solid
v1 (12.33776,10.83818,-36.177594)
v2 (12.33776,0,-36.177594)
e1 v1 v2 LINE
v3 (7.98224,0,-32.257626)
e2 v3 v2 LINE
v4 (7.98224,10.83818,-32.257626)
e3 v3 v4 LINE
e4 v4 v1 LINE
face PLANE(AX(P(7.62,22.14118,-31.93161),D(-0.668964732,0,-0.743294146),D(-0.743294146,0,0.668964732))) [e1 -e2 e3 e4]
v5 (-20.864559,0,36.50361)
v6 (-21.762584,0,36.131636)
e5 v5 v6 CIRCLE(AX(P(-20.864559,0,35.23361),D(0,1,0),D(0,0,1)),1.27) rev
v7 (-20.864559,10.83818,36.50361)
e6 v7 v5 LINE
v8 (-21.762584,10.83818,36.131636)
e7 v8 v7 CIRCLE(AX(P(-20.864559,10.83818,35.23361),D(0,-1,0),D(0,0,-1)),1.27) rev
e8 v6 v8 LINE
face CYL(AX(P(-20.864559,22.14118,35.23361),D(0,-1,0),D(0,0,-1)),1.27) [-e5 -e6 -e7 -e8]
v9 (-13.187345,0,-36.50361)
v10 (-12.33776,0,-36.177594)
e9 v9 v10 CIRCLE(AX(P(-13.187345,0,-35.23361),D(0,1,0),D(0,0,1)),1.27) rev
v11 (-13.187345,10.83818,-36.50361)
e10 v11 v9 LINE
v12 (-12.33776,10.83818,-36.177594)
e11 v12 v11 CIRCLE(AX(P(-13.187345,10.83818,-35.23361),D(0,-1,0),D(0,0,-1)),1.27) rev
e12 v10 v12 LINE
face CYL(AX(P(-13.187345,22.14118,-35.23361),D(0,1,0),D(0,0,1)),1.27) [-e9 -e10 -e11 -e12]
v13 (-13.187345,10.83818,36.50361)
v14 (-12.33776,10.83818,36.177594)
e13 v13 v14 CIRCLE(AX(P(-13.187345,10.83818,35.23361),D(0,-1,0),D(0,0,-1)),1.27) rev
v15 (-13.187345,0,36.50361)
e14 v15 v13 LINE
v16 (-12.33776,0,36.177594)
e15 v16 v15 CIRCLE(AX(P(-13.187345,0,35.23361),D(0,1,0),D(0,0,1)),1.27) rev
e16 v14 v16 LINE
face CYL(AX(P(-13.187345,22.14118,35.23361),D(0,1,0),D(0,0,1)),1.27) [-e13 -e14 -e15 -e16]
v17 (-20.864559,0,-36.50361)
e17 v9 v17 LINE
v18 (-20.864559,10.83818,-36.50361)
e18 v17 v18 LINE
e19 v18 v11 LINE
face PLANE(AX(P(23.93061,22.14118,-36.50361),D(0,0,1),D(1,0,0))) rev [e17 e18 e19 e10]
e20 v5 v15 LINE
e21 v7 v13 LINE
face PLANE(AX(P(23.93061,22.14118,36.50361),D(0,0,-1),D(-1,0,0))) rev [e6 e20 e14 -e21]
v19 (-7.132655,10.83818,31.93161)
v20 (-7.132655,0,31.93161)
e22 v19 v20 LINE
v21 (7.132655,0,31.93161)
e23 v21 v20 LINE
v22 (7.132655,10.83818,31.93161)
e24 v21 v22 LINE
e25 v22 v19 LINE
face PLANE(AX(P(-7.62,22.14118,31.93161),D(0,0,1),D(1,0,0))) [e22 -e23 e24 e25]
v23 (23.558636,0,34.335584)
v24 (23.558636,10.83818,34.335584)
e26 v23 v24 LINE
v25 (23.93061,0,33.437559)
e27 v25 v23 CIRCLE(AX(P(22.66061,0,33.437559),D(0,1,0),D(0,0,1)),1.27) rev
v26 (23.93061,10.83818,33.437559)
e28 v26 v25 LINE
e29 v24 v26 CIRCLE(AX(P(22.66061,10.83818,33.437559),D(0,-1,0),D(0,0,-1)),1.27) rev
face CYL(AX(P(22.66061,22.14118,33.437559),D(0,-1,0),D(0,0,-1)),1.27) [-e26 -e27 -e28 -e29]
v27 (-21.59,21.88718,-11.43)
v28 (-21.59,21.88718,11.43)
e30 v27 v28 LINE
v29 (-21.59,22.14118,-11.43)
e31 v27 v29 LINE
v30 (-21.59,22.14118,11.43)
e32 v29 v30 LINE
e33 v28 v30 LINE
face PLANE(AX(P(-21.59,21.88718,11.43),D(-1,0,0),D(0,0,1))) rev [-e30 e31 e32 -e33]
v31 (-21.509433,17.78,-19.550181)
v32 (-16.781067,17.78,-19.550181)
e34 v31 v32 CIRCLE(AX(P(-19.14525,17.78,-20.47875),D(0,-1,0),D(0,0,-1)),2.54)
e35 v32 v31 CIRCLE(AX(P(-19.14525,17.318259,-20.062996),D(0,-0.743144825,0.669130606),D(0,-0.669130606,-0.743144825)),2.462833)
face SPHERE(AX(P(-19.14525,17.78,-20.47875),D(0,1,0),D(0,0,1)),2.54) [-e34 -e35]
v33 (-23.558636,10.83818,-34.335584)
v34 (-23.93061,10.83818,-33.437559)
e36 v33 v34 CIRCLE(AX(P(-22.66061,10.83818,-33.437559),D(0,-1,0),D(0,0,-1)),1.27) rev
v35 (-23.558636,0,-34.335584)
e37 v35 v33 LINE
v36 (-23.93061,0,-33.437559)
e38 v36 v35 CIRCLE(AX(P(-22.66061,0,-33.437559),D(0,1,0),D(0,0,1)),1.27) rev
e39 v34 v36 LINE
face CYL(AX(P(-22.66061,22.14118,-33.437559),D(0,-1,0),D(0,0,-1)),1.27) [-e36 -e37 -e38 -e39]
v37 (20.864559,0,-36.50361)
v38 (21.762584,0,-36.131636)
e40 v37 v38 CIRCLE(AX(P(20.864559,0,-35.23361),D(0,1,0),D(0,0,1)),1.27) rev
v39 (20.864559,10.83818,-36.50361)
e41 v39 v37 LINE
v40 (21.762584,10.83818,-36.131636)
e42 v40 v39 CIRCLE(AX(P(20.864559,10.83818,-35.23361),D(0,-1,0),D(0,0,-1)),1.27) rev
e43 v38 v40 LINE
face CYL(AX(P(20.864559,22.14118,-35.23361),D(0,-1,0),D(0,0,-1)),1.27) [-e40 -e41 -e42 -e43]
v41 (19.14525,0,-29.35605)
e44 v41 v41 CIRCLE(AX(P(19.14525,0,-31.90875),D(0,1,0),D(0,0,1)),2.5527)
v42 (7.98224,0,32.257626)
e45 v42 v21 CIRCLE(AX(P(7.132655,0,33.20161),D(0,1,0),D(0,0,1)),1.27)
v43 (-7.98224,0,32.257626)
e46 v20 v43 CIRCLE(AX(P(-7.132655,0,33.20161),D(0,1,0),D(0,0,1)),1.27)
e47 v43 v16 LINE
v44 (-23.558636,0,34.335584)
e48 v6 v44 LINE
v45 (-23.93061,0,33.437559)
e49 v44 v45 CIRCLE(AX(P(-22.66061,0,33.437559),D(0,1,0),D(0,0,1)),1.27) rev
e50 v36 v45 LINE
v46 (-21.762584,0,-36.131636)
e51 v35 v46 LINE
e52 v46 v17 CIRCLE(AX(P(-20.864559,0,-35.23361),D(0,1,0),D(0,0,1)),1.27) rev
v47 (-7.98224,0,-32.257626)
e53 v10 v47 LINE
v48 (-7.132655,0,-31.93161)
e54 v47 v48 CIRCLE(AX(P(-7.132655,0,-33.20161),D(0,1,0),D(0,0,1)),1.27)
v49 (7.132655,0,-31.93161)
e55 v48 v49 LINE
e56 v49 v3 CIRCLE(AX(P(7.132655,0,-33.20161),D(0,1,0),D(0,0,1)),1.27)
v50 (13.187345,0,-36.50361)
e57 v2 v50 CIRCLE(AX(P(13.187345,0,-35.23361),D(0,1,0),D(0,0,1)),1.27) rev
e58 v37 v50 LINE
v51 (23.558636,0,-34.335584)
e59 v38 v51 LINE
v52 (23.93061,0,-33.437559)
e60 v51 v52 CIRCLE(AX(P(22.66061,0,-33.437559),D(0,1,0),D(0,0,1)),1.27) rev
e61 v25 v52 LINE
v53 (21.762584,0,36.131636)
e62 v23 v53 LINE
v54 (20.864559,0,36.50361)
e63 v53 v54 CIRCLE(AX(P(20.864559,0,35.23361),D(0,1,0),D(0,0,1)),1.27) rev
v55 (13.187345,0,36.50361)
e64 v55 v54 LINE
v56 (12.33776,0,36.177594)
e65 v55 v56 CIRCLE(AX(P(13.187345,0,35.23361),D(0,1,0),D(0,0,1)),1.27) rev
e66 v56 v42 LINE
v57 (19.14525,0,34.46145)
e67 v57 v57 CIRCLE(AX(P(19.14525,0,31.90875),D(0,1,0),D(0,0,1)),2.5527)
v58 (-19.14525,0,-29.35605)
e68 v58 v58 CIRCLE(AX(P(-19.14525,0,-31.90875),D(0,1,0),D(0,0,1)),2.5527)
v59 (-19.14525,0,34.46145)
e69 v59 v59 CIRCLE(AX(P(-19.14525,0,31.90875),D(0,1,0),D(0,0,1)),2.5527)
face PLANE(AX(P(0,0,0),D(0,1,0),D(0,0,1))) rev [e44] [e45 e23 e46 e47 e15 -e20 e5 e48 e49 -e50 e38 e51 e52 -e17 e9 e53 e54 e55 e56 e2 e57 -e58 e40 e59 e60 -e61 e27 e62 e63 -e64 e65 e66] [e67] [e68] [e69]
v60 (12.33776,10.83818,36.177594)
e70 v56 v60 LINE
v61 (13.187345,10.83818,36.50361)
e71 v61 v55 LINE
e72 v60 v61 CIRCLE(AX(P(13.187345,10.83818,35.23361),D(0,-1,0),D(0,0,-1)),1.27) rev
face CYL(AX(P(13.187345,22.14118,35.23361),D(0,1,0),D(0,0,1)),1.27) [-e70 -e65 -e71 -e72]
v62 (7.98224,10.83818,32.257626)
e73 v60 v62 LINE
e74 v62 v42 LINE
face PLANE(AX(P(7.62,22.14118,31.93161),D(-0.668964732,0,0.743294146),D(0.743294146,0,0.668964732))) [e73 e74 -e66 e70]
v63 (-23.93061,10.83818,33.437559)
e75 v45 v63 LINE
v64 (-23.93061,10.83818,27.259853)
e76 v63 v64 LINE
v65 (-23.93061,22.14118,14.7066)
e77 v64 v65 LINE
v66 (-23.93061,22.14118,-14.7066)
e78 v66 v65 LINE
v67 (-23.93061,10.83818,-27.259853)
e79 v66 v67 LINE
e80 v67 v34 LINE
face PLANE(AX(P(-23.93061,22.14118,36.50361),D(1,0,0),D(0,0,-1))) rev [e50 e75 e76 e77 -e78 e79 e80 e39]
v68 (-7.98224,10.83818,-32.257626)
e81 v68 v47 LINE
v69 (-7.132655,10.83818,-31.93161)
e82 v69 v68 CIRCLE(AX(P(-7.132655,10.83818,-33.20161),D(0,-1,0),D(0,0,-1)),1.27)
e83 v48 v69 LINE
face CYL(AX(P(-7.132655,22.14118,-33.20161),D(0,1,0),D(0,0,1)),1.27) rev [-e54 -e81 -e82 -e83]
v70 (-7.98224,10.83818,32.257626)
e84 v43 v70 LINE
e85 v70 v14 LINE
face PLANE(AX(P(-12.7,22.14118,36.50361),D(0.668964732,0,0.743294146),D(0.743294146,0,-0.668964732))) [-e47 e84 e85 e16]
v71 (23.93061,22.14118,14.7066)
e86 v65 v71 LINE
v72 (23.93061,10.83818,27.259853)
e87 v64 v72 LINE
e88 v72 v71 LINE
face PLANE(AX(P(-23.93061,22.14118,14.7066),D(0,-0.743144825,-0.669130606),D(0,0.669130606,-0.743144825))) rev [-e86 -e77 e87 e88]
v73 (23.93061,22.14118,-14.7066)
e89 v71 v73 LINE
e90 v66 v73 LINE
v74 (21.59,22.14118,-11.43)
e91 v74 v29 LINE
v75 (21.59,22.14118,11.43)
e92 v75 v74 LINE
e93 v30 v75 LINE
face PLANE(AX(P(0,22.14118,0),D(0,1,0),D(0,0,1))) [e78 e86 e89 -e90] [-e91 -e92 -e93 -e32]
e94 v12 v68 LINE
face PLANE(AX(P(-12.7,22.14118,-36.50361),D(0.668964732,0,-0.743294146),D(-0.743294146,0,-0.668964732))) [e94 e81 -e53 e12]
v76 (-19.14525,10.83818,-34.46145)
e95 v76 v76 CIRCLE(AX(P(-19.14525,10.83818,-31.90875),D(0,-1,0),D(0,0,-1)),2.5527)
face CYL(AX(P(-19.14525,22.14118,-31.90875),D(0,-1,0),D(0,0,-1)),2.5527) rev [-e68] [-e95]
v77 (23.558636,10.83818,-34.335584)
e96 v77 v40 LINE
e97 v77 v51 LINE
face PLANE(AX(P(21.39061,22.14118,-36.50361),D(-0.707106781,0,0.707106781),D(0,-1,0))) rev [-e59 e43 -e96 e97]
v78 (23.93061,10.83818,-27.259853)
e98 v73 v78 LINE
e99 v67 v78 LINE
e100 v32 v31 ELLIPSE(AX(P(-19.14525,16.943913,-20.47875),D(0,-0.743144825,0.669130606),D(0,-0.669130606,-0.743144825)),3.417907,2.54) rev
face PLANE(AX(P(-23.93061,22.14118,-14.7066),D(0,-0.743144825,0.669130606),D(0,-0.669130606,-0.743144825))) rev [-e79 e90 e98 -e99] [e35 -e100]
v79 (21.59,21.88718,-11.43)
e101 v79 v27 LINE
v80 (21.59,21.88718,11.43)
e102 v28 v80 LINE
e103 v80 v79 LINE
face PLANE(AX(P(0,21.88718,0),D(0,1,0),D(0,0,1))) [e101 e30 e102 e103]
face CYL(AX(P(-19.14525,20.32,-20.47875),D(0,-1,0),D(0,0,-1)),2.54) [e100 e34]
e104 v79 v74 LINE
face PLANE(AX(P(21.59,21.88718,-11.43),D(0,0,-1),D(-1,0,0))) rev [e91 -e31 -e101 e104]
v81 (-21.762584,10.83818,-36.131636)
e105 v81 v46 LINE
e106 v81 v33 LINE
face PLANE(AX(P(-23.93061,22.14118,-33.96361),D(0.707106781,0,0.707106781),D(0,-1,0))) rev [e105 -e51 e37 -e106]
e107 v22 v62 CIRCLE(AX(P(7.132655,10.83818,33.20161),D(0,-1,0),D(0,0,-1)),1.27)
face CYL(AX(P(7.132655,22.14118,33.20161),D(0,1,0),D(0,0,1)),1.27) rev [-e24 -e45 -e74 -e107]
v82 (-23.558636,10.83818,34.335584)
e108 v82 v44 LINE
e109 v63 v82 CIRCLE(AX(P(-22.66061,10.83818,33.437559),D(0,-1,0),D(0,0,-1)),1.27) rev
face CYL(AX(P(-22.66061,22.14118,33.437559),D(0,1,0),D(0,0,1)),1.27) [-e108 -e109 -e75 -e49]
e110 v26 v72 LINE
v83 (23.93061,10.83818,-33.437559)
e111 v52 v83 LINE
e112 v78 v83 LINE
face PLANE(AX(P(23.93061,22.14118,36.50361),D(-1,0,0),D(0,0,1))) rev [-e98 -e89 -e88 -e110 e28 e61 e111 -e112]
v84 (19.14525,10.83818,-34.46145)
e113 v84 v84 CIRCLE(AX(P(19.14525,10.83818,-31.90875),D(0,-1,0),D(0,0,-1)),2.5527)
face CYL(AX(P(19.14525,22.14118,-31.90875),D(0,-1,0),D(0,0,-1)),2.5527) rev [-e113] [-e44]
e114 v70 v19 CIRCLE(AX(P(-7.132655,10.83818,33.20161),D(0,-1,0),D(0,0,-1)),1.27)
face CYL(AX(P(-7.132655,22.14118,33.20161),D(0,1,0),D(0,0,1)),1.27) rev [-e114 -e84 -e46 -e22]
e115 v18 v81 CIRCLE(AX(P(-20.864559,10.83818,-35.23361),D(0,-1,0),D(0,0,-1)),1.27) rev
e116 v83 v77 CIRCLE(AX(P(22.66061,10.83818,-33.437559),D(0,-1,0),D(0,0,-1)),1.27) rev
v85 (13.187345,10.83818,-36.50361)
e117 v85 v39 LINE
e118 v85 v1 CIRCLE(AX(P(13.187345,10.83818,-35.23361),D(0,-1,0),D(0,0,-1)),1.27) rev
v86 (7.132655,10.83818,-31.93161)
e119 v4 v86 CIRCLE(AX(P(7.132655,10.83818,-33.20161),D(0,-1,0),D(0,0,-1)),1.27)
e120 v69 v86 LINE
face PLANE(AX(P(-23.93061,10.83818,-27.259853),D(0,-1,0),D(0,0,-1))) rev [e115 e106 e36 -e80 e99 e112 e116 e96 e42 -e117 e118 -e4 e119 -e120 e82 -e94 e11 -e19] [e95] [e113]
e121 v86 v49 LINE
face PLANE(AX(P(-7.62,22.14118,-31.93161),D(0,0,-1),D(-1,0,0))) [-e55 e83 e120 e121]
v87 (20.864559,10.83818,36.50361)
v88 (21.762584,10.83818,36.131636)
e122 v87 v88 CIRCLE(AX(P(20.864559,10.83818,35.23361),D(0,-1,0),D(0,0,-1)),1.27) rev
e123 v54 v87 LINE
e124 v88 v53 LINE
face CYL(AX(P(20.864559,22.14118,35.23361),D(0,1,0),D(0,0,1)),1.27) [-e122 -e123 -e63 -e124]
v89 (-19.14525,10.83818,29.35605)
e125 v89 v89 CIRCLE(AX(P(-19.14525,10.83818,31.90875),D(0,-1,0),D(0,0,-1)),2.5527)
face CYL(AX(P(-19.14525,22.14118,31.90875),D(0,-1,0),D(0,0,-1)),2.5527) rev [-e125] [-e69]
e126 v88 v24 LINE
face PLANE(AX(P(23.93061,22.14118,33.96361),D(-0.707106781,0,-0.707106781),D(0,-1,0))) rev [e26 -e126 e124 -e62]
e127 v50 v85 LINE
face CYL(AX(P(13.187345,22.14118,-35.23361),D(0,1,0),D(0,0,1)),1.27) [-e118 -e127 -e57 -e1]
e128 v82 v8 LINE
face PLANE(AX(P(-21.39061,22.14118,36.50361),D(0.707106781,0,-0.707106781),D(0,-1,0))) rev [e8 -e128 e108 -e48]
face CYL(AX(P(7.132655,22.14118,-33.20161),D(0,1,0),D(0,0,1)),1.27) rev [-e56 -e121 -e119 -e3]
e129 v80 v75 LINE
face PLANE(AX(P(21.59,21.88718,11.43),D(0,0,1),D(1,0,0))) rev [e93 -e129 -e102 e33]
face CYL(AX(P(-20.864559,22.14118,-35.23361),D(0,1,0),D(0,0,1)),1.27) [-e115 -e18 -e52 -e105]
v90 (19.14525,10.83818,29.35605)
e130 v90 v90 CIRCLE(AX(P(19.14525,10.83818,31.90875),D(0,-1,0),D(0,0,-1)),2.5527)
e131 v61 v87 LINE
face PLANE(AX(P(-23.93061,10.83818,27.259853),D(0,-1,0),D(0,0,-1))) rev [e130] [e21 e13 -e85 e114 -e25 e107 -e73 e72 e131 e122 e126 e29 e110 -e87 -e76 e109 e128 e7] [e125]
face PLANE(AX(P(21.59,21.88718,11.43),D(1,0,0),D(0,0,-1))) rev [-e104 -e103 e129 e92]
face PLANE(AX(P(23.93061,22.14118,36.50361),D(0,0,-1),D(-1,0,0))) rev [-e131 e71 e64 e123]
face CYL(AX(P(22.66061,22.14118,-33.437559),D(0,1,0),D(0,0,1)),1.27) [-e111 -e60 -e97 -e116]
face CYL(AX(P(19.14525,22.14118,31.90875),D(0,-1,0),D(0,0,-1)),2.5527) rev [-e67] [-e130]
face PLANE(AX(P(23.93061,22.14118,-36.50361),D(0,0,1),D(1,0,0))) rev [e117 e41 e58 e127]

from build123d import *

# Parameters (mm, degrees)
SKETCH1_W               = 47.86122
SKETCH1_H               = 73.00722
SKETCH1_R               = 2.5527
BOSS_EXTRUDE1_DEPTH     = 22.14118
CUT_EXTRUDE1_DEPTH      = 49.943022892
CUT_EXTRUDE1_DEPTH_BACK = 49.943022892
CHAMFER1_SIZE           = 2.54
CUT_EXTRUDE2_DEPTH      = 49.943022892
SKETCH5_W               = 43.18
SKETCH5_H               = 22.86
CUT_EXTRUDE3_DEPTH      = 0.254
SKETCH7_R               = 2.54
BOSS_EXTRUDE3_DEPTH     = 20.32
FILLET1_R               = 2.54
FILLET2_R               = 1.27


with BuildPart() as part:
    # Sketch1 → Boss-Extrude1 (new body)
    with BuildSketch(Plane(origin=(0, 0, 0), x_dir=(1, 0, 0), z_dir=(0, 1, 0))):
        Rectangle(SKETCH1_W, SKETCH1_H)
        with Locations(Location((-19.14525, 31.90875, 0), (0, 0, 270))):
            Circle(SKETCH1_R, mode=Mode.SUBTRACT)
        with Locations(Location((19.14525, 31.90875, 0), (0, 0, 270))):
            Circle(SKETCH1_R, mode=Mode.SUBTRACT)
        with Locations(Location((19.14525, -31.90875, 0), (0, 0, 270))):
            Circle(SKETCH1_R, mode=Mode.SUBTRACT)
        with Locations(Location((-19.14525, -31.90875, 0), (0, 0, 270))):
            Circle(SKETCH1_R, mode=Mode.SUBTRACT)
    extrude(amount=BOSS_EXTRUDE1_DEPTH)

    # Sketch2 → Cut-Extrude1 (cut, two sides: drawn at the far end of the back side and taken through both)
    with BuildSketch(Plane(origin=(0, 0, 0), x_dir=(0, 0, -1), z_dir=(1, 0, 0)).offset(-CUT_EXTRUDE1_DEPTH_BACK)):
        Polygon((14.7066, 22.14118), (-14.7066, 22.14118), (-27.259853255, 10.83818), (-36.50361, 10.83818), (-45.550551374, 42.074053009), (0, 43.630244296), (45.550551374, 42.074053009), (36.50361, 10.83818), (27.259853255, 10.83818), align=None)
    extrude(amount=CUT_EXTRUDE1_DEPTH + CUT_EXTRUDE1_DEPTH_BACK, mode=Mode.SUBTRACT)

    # Chamfer1
    chamfer1_edges = [part.edges().sort_by_distance(p)[0] for p in [
        (-23.93061, 5.41909, -36.50361),
        (23.93061, 5.41909, -36.50361),
        (23.93061, 5.41909, 36.50361),
        (-23.93061, 5.41909, 36.50361),
    ]]
    chamfer(chamfer1_edges, length=CHAMFER1_SIZE)

    # Sketch4 → Cut-Extrude2 (cut, through all)
    with BuildSketch(Plane(origin=(0, 0, 0), x_dir=(1, 0, 0), z_dir=(0, 1, 0))):
        Polygon((-12.7, 36.50361), (-7.62, 31.93161), (7.62, 31.93161), (12.7, 36.50361), align=None)
        Polygon((-12.7, -36.50361), (-7.62, -31.93161), (7.62, -31.93161), (12.7, -36.50361), align=None)
    extrude(amount=CUT_EXTRUDE2_DEPTH, mode=Mode.SUBTRACT)

    # Sketch5 → Cut-Extrude3 (cut)
    with BuildSketch(Plane(origin=(0, 22.14118, 0), x_dir=(1, 0, 0), z_dir=(0, 1, 0))):
        Rectangle(SKETCH5_W, SKETCH5_H)
    extrude(amount=-CUT_EXTRUDE3_DEPTH, mode=Mode.SUBTRACT)

    # Sketch7 → Boss-Extrude3 (add)
    with BuildSketch(Plane(origin=(0, 0, 0), x_dir=(1, 0, 0), z_dir=(0, 1, 0))):
        with Locations(Location((-19.14525, 20.47875, 0), (0, 0, 90))):
            Circle(SKETCH7_R)
    extrude(amount=BOSS_EXTRUDE3_DEPTH)

    # Fillet1
    # the kernel refuses this fillet: 2.54 mm, written as the material it takes off along each edge
    with BuildSketch(Plane(origin=(-19.14525, 20.32, -20.47875), x_dir=(0, 0, -1), z_dir=(1, 0, 0))) as fillet1_piece_1_section:
        with BuildLine():
            CenterArc((2.54 - FILLET1_R, -FILLET1_R), FILLET1_R, 0, 90)
            Line((2.54 - FILLET1_R, 0), (2.54, 0))
            Line((2.54, 0), (2.54, -FILLET1_R))
        make_face()
    fillet1_piece_1 = revolve(axis=Axis((-19.14525, 20.32, -20.47875), (0, 1, 0)), mode=Mode.PRIVATE)
    fillet1_piece_1 = split(fillet1_piece_1, bisect_by=Plane(origin=(-19.14525, 19.033531864, -18.157992912), z_dir=(0, 0.7431448254773929, -0.6691306063588597)), keep=Keep.TOP, mode=Mode.PRIVATE)
    add(fillet1_piece_1, mode=Mode.SUBTRACT)

    # Fillet2
    fillet2_edges = [part.edges().sort_by_distance(p)[0] for p in [
        (-12.7, 5.41909, 36.50361),
        (12.7, 5.41909, 36.50361),
        (7.62, 5.41909, 31.93161),
        (-7.62, 5.41909, 31.93161),
        (-23.93061, 5.41909, 33.96361),
        (-23.93061, 5.41909, -33.96361),
        (21.39061, 5.41909, -36.50361),
        (-21.39061, 5.41909, -36.50361),
        (23.93061, 5.41909, 33.96361),
        (23.93061, 5.41909, -33.96361),
        (21.39061, 5.41909, 36.50361),
        (-21.39061, 5.41909, 36.50361),
        (12.7, 5.41909, -36.50361),
        (-12.7, 5.41909, -36.50361),
        (-7.62, 5.41909, -31.93161),
        (7.62, 5.41909, -31.93161),
    ]]
    fillet(fillet2_edges, radius=FILLET2_R)


solid = part.part
